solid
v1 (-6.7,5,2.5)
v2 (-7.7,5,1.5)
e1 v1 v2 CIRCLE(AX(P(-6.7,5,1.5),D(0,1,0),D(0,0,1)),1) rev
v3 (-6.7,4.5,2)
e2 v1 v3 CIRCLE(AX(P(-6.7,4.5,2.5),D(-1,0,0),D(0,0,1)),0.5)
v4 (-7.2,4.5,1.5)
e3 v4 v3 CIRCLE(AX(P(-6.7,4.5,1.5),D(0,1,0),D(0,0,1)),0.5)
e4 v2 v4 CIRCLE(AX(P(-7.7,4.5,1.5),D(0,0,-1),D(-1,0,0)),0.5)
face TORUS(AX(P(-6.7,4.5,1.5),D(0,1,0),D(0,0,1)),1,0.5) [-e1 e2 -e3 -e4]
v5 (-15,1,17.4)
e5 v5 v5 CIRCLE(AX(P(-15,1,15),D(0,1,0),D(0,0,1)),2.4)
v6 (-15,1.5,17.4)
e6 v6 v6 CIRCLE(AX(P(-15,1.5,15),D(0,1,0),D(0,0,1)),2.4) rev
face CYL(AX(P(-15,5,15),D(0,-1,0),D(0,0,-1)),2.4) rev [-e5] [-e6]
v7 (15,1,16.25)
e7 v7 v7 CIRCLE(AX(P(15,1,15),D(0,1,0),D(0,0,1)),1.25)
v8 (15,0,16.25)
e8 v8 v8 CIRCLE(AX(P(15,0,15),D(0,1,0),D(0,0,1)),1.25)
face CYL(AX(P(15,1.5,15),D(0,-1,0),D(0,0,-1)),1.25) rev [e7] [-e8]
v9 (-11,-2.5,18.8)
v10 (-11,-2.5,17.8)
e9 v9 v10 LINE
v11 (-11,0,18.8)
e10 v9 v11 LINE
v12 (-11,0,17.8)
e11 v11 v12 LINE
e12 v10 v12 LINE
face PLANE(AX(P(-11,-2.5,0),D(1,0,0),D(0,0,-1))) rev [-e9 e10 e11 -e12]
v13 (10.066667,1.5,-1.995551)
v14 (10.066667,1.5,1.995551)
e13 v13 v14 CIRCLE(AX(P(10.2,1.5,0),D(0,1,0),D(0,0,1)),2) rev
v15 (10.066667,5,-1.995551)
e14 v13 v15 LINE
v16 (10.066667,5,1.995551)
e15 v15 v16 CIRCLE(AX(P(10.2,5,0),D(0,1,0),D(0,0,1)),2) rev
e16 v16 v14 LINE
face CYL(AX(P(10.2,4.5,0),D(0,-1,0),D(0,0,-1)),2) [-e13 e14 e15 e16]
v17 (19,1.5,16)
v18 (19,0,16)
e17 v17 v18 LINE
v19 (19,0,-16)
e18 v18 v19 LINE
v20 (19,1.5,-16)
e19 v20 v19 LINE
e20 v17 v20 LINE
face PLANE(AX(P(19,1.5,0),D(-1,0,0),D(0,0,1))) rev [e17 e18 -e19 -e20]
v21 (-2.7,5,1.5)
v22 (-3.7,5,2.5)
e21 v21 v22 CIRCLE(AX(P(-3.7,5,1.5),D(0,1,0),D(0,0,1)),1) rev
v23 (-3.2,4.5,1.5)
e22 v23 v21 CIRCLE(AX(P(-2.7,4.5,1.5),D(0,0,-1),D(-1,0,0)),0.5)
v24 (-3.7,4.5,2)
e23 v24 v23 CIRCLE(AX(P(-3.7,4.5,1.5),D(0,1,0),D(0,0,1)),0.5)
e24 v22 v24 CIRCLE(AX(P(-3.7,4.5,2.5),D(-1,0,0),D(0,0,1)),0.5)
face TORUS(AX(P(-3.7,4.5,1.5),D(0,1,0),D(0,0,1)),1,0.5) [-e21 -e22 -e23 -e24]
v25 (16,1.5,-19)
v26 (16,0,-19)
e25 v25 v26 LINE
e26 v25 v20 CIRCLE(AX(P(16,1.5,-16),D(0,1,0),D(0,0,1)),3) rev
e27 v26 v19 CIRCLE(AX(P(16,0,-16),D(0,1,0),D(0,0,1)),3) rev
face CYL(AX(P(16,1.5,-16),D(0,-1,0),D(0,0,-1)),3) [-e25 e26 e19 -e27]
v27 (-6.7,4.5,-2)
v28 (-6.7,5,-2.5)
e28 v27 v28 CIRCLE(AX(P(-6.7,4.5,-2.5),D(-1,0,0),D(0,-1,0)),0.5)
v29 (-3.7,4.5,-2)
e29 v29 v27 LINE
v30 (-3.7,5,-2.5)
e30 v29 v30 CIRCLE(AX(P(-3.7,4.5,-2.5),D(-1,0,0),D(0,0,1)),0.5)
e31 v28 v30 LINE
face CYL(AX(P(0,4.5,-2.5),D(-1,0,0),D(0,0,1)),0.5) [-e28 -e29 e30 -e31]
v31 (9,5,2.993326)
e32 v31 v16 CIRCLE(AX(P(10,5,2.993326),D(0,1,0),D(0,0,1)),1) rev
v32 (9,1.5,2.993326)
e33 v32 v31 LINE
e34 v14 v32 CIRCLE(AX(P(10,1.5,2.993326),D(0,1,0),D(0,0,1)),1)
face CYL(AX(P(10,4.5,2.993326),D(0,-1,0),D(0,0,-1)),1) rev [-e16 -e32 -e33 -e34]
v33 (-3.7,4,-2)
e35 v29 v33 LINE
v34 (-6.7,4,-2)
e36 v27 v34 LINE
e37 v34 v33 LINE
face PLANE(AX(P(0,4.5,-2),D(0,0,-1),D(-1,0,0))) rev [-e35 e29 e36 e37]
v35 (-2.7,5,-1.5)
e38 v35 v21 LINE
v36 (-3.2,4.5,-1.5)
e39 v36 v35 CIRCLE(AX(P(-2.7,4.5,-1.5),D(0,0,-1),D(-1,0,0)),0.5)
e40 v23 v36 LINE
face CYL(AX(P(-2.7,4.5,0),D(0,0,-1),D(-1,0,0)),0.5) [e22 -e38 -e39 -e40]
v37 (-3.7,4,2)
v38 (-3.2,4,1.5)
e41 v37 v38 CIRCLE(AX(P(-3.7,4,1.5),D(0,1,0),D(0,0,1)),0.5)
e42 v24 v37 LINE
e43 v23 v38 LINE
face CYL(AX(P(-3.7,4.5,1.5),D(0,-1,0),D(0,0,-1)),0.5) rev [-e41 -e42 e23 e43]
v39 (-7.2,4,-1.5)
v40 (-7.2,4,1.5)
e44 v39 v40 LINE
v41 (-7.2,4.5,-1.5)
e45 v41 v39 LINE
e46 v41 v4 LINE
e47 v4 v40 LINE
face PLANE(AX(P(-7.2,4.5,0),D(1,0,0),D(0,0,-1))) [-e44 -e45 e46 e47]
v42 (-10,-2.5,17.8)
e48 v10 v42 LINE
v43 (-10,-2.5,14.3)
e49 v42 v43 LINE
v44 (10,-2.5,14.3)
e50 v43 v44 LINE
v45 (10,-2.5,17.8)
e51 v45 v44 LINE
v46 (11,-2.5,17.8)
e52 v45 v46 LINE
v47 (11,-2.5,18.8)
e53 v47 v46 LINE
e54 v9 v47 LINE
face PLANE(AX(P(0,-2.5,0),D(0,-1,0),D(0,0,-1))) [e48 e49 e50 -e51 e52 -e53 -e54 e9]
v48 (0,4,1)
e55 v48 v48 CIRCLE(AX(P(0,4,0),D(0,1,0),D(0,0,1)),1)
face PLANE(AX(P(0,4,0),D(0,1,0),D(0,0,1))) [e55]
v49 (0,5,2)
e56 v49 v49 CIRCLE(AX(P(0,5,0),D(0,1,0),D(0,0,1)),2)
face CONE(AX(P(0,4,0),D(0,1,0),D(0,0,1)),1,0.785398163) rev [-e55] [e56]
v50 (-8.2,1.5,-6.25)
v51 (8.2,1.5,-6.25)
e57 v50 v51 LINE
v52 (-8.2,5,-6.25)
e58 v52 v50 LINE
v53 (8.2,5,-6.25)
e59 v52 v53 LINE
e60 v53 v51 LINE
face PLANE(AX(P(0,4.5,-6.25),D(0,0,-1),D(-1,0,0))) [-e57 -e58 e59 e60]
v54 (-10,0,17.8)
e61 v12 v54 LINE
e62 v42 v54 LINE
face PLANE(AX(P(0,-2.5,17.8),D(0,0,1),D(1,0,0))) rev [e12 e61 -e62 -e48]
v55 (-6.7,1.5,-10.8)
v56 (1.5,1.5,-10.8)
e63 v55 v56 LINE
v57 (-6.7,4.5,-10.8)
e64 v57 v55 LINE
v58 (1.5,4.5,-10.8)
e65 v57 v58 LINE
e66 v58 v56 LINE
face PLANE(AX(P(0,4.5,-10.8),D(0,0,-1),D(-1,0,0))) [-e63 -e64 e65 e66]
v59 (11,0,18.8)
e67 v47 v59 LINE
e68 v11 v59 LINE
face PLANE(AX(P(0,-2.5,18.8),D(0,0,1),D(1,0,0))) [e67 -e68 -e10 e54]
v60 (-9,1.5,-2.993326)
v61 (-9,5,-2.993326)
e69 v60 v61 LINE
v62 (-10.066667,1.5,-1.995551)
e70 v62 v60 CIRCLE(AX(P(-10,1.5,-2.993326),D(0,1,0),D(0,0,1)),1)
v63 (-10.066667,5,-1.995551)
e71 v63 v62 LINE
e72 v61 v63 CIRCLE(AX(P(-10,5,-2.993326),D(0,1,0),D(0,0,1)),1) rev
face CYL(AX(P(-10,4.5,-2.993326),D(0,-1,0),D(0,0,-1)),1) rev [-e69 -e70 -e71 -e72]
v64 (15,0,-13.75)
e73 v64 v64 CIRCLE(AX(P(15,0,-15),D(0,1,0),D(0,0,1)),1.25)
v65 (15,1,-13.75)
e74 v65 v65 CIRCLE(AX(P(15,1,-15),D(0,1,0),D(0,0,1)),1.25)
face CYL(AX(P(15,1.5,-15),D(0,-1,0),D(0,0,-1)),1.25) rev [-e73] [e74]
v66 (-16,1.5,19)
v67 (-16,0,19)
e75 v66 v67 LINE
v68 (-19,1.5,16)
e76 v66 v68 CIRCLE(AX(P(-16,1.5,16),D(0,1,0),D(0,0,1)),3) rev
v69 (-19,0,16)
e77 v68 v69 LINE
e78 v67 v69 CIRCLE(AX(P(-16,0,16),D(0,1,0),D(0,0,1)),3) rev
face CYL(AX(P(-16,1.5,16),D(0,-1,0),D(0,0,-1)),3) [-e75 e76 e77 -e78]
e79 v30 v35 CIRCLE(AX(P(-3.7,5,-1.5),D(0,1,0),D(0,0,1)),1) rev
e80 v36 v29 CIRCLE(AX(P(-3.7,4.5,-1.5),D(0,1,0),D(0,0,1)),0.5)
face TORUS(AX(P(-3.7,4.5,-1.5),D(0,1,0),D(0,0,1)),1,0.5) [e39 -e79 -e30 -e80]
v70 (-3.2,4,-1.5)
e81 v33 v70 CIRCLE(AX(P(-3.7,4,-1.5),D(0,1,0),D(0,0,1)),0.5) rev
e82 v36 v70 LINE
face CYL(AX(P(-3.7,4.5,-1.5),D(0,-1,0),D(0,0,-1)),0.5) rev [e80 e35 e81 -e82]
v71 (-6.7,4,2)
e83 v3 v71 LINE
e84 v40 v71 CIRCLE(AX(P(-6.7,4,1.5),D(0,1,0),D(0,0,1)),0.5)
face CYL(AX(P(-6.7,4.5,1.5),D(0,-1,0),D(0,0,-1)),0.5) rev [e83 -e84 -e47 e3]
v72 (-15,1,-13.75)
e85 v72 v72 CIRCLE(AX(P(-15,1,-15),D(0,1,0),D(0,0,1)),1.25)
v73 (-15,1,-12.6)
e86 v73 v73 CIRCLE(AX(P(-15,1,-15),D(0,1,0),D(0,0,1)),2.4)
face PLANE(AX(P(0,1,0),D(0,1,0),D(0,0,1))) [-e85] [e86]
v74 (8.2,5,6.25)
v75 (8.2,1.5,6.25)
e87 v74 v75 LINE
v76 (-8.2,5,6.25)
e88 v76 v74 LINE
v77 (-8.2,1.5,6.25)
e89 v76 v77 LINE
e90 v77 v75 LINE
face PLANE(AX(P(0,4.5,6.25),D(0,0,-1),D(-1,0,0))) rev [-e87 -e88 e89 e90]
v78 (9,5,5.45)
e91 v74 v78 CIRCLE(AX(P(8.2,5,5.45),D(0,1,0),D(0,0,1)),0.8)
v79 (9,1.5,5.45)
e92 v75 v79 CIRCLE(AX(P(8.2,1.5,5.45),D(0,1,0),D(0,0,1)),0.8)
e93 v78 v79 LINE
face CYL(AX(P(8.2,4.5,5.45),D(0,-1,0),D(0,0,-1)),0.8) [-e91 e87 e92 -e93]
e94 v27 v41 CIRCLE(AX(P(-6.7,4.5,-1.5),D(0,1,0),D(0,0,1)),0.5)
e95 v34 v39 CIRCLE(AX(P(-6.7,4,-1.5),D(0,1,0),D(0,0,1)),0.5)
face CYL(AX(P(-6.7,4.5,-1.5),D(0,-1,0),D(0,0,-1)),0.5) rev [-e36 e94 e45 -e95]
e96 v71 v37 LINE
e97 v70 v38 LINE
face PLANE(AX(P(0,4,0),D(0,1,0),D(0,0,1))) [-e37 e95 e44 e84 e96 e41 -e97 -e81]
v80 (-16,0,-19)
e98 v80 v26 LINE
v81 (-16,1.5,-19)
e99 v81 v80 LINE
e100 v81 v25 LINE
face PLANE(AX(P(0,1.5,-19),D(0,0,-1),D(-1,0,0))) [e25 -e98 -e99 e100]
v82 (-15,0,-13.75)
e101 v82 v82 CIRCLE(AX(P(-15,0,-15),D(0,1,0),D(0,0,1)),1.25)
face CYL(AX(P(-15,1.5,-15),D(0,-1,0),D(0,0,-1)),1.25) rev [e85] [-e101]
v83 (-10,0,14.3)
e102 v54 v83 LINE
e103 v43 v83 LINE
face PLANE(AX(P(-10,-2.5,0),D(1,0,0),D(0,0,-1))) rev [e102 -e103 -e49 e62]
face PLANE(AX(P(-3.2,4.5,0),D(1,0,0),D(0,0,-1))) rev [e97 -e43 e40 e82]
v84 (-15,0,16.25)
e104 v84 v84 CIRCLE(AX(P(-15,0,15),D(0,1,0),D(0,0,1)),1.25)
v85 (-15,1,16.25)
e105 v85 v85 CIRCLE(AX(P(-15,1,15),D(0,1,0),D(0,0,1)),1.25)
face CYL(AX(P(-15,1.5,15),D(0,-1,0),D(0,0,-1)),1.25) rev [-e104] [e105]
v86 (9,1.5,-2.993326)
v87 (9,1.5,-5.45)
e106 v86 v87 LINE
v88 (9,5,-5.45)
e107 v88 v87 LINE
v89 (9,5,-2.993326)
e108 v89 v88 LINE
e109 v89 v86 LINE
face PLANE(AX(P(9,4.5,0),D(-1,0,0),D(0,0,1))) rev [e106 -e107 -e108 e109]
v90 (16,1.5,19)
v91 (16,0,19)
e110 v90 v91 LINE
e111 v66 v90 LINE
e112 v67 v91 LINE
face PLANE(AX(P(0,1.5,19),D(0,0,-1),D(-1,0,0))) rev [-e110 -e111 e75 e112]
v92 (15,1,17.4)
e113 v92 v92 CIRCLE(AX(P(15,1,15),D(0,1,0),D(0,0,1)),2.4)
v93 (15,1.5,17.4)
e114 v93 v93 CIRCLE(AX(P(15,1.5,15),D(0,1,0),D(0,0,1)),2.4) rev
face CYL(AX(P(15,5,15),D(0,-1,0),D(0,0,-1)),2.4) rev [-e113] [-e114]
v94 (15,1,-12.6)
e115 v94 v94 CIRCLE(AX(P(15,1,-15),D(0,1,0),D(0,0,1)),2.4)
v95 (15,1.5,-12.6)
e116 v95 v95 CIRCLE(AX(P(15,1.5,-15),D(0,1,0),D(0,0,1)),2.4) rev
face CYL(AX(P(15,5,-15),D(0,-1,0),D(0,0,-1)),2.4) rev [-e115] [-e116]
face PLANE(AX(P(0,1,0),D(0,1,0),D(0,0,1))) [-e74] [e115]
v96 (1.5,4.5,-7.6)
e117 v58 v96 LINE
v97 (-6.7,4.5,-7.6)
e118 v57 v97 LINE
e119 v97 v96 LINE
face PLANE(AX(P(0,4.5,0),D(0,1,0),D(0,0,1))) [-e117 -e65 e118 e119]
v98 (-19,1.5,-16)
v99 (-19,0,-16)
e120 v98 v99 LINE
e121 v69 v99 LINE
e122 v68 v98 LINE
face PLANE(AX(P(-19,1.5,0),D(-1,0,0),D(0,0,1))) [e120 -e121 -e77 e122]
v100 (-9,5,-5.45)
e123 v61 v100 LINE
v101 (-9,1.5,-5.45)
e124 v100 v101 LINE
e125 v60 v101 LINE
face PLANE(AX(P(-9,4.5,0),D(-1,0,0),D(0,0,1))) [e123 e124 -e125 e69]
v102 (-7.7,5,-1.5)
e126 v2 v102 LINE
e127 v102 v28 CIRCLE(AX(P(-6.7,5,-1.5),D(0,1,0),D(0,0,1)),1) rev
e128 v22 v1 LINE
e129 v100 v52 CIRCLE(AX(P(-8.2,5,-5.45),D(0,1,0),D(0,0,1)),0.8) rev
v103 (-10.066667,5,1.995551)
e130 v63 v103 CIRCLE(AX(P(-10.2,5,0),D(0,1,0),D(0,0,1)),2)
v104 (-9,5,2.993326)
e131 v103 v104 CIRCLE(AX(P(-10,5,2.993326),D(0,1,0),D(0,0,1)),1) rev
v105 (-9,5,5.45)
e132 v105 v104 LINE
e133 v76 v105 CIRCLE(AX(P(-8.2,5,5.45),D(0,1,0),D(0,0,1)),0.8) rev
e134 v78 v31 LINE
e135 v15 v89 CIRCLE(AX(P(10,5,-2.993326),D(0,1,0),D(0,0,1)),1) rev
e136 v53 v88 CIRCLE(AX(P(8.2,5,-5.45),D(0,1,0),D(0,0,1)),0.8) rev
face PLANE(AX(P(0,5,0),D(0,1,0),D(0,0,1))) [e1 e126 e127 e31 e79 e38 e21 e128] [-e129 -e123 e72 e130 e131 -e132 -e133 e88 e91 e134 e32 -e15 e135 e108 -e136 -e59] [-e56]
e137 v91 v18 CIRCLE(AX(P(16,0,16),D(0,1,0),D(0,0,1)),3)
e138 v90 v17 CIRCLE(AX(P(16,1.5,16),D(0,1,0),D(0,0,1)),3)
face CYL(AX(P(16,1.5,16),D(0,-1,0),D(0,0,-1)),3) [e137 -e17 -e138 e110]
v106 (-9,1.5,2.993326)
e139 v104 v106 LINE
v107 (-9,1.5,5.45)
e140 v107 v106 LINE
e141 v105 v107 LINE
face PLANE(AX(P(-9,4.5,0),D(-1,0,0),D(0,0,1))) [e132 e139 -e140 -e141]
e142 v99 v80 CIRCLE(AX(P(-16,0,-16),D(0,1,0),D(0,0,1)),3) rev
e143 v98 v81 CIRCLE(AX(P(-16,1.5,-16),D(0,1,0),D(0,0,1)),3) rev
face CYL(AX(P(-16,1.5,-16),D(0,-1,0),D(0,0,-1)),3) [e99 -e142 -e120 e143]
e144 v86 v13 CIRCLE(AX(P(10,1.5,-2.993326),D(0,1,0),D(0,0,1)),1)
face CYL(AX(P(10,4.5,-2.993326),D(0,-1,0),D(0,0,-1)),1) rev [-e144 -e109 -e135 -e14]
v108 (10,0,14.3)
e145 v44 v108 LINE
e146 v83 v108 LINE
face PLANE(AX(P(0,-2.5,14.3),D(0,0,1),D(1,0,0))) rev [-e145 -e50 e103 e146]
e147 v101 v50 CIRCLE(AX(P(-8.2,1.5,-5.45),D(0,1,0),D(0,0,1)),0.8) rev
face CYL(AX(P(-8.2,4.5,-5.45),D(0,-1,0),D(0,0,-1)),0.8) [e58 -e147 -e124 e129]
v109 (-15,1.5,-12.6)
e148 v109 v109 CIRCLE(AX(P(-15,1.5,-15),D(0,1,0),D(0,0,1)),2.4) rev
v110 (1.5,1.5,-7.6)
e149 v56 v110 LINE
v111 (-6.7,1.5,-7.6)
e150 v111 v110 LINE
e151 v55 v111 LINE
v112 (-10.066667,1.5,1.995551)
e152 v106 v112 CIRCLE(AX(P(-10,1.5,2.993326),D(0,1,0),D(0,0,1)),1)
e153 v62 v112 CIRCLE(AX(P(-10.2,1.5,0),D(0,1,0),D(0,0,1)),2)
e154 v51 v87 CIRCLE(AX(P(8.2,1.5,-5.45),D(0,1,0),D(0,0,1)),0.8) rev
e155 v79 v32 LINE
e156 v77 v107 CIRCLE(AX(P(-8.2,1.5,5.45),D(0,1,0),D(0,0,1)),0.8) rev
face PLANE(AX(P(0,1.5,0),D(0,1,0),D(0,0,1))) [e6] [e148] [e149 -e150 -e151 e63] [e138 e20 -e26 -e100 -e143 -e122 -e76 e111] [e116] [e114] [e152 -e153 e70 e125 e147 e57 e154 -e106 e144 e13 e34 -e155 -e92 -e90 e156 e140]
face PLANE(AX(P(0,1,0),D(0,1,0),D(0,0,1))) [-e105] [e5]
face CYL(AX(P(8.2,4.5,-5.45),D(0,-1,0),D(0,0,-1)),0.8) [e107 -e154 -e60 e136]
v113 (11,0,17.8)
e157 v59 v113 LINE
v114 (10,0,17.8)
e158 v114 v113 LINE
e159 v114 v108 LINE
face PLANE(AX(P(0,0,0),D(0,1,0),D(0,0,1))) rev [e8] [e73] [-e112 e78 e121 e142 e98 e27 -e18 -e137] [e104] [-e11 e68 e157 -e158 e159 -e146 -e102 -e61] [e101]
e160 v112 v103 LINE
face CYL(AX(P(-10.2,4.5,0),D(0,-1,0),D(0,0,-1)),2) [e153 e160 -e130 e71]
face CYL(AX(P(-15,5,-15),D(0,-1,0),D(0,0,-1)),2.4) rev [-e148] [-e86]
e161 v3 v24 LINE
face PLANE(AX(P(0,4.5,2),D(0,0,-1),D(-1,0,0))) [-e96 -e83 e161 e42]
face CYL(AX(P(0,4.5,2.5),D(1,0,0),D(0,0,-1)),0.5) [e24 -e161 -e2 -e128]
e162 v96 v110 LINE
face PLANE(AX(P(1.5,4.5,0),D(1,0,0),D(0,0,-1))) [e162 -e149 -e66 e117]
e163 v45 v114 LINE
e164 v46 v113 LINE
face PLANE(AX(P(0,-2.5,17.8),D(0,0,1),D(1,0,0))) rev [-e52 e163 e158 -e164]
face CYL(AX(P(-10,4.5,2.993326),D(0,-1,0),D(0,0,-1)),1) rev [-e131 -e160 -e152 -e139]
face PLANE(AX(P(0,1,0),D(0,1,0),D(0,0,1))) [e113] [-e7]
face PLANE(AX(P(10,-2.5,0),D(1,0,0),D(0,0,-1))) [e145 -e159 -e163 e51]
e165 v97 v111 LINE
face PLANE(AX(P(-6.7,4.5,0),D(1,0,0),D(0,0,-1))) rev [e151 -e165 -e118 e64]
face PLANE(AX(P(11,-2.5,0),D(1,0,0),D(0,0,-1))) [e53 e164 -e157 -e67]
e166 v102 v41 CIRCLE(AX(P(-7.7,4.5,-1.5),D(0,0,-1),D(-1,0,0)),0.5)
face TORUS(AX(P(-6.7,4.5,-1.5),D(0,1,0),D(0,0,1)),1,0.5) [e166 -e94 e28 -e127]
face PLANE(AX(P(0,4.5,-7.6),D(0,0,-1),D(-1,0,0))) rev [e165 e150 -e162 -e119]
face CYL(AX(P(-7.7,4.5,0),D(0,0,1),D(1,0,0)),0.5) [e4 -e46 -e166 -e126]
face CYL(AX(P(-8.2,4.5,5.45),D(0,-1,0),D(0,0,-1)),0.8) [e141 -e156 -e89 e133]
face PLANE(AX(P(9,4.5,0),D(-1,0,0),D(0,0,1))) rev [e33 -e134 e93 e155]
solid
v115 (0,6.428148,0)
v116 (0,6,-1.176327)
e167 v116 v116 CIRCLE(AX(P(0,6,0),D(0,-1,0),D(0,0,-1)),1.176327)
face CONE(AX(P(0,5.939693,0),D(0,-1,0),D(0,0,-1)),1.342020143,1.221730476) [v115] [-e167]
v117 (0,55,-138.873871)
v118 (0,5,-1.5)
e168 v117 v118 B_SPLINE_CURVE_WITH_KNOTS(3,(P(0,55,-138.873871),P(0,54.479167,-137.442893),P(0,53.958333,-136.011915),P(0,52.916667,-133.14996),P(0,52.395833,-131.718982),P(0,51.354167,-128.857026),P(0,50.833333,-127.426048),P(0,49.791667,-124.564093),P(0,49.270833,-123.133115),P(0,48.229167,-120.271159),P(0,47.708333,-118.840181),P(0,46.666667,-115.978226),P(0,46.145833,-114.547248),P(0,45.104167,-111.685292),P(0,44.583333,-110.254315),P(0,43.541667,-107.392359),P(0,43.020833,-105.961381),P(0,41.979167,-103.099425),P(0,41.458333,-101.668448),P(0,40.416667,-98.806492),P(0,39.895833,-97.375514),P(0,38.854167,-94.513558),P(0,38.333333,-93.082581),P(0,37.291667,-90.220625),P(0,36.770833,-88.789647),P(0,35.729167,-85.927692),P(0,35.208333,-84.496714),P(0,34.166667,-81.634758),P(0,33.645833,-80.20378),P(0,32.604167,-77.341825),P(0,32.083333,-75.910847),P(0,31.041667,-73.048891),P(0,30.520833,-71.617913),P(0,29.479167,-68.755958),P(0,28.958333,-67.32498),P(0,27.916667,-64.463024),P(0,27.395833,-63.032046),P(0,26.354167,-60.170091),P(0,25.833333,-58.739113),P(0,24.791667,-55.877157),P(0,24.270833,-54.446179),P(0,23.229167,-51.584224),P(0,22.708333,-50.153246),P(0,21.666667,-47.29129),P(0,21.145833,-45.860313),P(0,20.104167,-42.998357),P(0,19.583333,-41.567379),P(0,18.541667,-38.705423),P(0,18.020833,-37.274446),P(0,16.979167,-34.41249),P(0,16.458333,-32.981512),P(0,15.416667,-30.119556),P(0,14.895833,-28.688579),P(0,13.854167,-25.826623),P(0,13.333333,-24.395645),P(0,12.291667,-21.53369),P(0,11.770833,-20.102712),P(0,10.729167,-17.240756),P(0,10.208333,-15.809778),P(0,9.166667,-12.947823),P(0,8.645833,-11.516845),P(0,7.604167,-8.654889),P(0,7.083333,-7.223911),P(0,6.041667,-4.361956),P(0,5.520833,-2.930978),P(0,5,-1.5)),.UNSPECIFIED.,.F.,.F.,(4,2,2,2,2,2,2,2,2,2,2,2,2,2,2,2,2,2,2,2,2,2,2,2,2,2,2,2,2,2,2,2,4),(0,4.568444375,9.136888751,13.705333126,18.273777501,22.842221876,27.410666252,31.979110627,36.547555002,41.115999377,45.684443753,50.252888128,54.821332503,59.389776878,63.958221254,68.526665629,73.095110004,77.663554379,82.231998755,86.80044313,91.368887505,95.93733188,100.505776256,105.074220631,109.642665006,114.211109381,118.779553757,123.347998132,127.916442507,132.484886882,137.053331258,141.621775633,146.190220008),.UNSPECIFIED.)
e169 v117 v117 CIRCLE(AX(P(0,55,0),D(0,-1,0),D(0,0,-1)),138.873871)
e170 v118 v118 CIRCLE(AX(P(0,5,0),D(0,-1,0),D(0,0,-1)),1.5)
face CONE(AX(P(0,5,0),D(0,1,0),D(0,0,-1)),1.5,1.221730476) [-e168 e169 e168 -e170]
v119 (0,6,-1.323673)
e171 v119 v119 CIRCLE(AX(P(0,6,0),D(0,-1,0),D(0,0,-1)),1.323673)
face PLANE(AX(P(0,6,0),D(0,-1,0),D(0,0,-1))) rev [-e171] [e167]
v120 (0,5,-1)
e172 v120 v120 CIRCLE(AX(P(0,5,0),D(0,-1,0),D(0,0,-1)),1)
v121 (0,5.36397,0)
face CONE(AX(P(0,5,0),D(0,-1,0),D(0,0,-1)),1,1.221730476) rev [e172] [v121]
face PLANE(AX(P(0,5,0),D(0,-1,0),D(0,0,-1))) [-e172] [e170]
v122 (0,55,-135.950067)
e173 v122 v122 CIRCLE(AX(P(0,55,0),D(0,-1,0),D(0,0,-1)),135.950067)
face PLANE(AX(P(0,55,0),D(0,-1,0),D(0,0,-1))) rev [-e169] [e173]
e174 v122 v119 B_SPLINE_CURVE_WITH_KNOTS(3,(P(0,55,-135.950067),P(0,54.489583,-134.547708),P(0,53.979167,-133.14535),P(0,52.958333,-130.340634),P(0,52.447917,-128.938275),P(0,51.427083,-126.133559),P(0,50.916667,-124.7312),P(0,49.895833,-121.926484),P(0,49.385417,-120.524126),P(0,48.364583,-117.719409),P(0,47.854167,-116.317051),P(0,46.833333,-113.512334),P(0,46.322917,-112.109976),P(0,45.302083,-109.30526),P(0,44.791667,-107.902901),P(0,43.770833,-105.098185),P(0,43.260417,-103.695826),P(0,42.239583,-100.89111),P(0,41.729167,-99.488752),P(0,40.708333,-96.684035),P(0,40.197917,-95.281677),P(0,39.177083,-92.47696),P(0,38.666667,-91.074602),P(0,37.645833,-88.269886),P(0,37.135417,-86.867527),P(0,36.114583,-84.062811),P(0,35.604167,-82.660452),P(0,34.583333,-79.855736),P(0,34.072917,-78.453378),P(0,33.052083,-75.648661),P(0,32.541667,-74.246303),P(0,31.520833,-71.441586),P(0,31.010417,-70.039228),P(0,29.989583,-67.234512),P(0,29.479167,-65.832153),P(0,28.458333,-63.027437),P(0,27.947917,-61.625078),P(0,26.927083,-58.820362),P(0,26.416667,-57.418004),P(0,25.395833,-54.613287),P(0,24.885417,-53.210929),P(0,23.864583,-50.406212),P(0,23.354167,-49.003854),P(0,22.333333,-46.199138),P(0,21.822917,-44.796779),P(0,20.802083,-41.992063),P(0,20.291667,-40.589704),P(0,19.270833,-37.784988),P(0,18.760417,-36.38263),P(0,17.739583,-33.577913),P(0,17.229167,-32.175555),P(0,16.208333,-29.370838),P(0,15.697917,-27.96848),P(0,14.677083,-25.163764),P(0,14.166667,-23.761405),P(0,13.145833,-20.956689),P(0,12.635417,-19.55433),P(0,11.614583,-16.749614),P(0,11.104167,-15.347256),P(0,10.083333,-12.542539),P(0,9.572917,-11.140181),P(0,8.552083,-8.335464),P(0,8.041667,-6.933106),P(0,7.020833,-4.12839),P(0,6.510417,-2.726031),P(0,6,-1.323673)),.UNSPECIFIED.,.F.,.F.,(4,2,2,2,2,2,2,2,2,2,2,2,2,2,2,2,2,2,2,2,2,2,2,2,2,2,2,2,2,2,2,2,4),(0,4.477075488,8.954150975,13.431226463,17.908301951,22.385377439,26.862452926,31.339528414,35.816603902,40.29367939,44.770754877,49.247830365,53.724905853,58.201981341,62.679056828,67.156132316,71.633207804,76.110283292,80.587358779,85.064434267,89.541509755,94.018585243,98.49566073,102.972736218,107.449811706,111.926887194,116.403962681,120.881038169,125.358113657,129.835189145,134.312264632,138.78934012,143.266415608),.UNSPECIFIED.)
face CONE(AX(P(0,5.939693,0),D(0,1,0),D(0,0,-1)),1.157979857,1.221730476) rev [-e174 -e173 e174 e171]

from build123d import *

# Parameters (mm, degrees)
SKETCH1_R           = 2.4
SKETCH1_W           = 8.2
SKETCH1_H           = 3.2
SKETCH1_R_2         = 1.25
BOSS_EXTRUDE1_DEPTH = 1.5
SKETCH1_3_R         = 2
SKETCH1_3_W         = 8.2
SKETCH1_3_H         = 3.2
BOSS_EXTRUDE2_DEPTH = 4.5
SKETCH1_4_R         = 2
BOSS_EXTRUDE3_DEPTH = 5
SKETCH1_5_R         = 2
BOSS_EXTRUDE4_DEPTH = 4
CUT_EXTRUDE1_START  = 1
SKETCH1_6_R         = 2.4
SKETCH1_6_R_2       = 1.25
CUT_EXTRUDE1_DEPTH  = 4
CHAMFER1_SIZE       = 1
FILLET1_R           = 0.5
FILLET2_R           = 1
SKETCH2_W           = 22
SKETCH2_H           = 1
SKETCH2_W_2         = 20
SKETCH2_H_2         = 3.5
BOSS_EXTRUDE5_DEPTH = 2.5
SHELL1_T            = -1


# Read off the part's stored shape, not the designer's step: Boss-Extrude6
with BuildPart() as part:
    # Sketch1 → Boss-Extrude1 (new body)
    # profile 1 of 5: a face of its own
    with BuildSketch(Plane(origin=(0, 0, 0), x_dir=(1, 0, 0), z_dir=(0, 1, 0))):
        with BuildLine():
            ThreePointArc((-19, 16), (-18.121320344, 18.121320344), (-16, 19))
            Line((-16, 19), (16, 19))
            ThreePointArc((16, 19), (18.121320344, 18.121320344), (19, 16))
            Line((19, 16), (19, -16))
            ThreePointArc((19, -16), (18.121320344, -18.121320344), (16, -19))
            Line((16, -19), (-16, -19))
            ThreePointArc((-16, -19), (-18.121320344, -18.121320344), (-19, -16))
            Line((-19, -16), (-19, 16))
        make_face()
        with Locations((15, -15)):
            Circle(SKETCH1_R, mode=Mode.SUBTRACT)
        with Locations((15, 15)):
            Circle(SKETCH1_R, mode=Mode.SUBTRACT)
        with Locations((-15, 15)):
            Circle(SKETCH1_R, mode=Mode.SUBTRACT)
        with Locations((-15, -15)):
            Circle(SKETCH1_R, mode=Mode.SUBTRACT)
        with Locations((-2.6, 9.2)):
            Rectangle(SKETCH1_W, SKETCH1_H, mode=Mode.SUBTRACT)
        with BuildLine():
            Line((-9, 1.6), (-9, 5.45))
            ThreePointArc((-9, 5.45), (-8.765685425, 6.015685425), (-8.2, 6.25))
            Line((-8.2, 6.25), (8.2, 6.25))
            ThreePointArc((8.2, 6.25), (8.765685425, 6.015685425), (9, 5.45))
            Line((9, 5.45), (9, 1.6))
            ThreePointArc((9, 1.6), (12.2, 0), (9, -1.6))
            Line((9, -1.6), (9, -5.45))
            ThreePointArc((9, -5.45), (8.765685425, -6.015685425), (8.2, -6.25))
            Line((8.2, -6.25), (-8.2, -6.25))
            ThreePointArc((-8.2, -6.25), (-8.765685425, -6.015685425), (-9, -5.45))
            Line((-9, -5.45), (-9, -1.6))
            ThreePointArc((-9, -1.6), (-12.2, 0), (-9, 1.6))
        make_face(mode=Mode.SUBTRACT)
    # profile 2 of 5: a face of its own
    with BuildSketch(Plane(origin=(0, 0, 0), x_dir=(1, 0, 0), z_dir=(0, 1, 0))):
        with Locations((15, 15)):
            Circle(SKETCH1_R)
        with Locations(Location((15, 15, 0), (0, 0, 270))):
            Circle(SKETCH1_R_2, mode=Mode.SUBTRACT)
    # profile 3 of 5: a face of its own
    with BuildSketch(Plane(origin=(0, 0, 0), x_dir=(1, 0, 0), z_dir=(0, 1, 0))):
        with Locations((-15, 15)):
            Circle(SKETCH1_R)
        with Locations(Location((-15, 15, 0), (0, 0, 270))):
            Circle(SKETCH1_R_2, mode=Mode.SUBTRACT)
    # profile 4 of 5: a face of its own
    with BuildSketch(Plane(origin=(0, 0, 0), x_dir=(1, 0, 0), z_dir=(0, 1, 0))):
        with Locations((-15, -15)):
            Circle(SKETCH1_R)
        with Locations(Location((-15, -15, 0), (0, 0, 270))):
            Circle(SKETCH1_R_2, mode=Mode.SUBTRACT)
    # profile 5 of 5: a face of its own
    with BuildSketch(Plane(origin=(0, 0, 0), x_dir=(1, 0, 0), z_dir=(0, 1, 0))):
        with Locations((15, -15)):
            Circle(SKETCH1_R)
        with Locations(Location((15, -15, 0), (0, 0, 270))):
            Circle(SKETCH1_R_2, mode=Mode.SUBTRACT)
    extrude(amount=BOSS_EXTRUDE1_DEPTH)

    # Sketch1<3> → Boss-Extrude2 (add)
    # profile 1 of 2: a face of its own
    with BuildSketch(Plane(origin=(0, 0, 0), x_dir=(1, 0, 0), z_dir=(0, 1, 0))):
        with BuildLine():
            ThreePointArc((-9, 5.45), (-8.765685425, 6.015685425), (-8.2, 6.25))
            Line((-8.2, 6.25), (8.2, 6.25))
            ThreePointArc((8.2, 6.25), (8.765685425, 6.015685425), (9, 5.45))
            Line((9, 5.45), (9, 1.6))
            ThreePointArc((9, 1.6), (12.2, 0), (9, -1.6))
            Line((9, -1.6), (9, -5.45))
            ThreePointArc((9, -5.45), (8.765685425, -6.015685425), (8.2, -6.25))
            Line((8.2, -6.25), (-8.2, -6.25))
            ThreePointArc((-8.2, -6.25), (-8.765685425, -6.015685425), (-9, -5.45))
            Line((-9, -5.45), (-9, -1.6))
            ThreePointArc((-9, -1.6), (-12.2, 0), (-9, 1.6))
            Line((-9, 1.6), (-9, 5.45))
        make_face()
        with Locations(Location((0, 0, 0), (0, 0, 270))):
            Circle(SKETCH1_3_R, mode=Mode.SUBTRACT)
        with BuildLine():
            ThreePointArc((-6.7, 2), (-7.053553391, 1.853553391), (-7.2, 1.5))
            Line((-7.2, 1.5), (-7.2, -1.5))
            ThreePointArc((-7.2, -1.5), (-7.053553391, -1.853553391), (-6.7, -2))
            Line((-6.7, -2), (-3.7, -2))
            ThreePointArc((-3.7, -2), (-3.346446609, -1.853553391), (-3.2, -1.5))
            Line((-3.2, -1.5), (-3.2, 1.5))
            ThreePointArc((-3.2, 1.5), (-3.346446609, 1.853553391), (-3.7, 2))
            Line((-3.7, 2), (-6.7, 2))
        make_face(mode=Mode.SUBTRACT)
    # profile 2 of 2: a face of its own
    with BuildSketch(Plane(origin=(0, 0, 0), x_dir=(1, 0, 0), z_dir=(0, 1, 0))):
        with Locations((-2.6, 9.2)):
            Rectangle(SKETCH1_3_W, SKETCH1_3_H)
    extrude(amount=BOSS_EXTRUDE2_DEPTH)

    # Sketch1<4> → Boss-Extrude3 (add)
    with BuildSketch(Plane(origin=(0, 0, 0), x_dir=(1, 0, 0), z_dir=(0, 1, 0))):
        with BuildLine():
            ThreePointArc((-9, 5.45), (-8.765685425, 6.015685425), (-8.2, 6.25))
            Line((-8.2, 6.25), (8.2, 6.25))
            ThreePointArc((8.2, 6.25), (8.765685425, 6.015685425), (9, 5.45))
            Line((9, 5.45), (9, 1.6))
            ThreePointArc((9, 1.6), (12.2, 0), (9, -1.6))
            Line((9, -1.6), (9, -5.45))
            ThreePointArc((9, -5.45), (8.765685425, -6.015685425), (8.2, -6.25))
            Line((8.2, -6.25), (-8.2, -6.25))
            ThreePointArc((-8.2, -6.25), (-8.765685425, -6.015685425), (-9, -5.45))
            Line((-9, -5.45), (-9, -1.6))
            ThreePointArc((-9, -1.6), (-12.2, 0), (-9, 1.6))
            Line((-9, 1.6), (-9, 5.45))
        make_face()
        with Locations(Location((0, 0, 0), (0, 0, 270))):
            Circle(SKETCH1_4_R, mode=Mode.SUBTRACT)
        with BuildLine():
            ThreePointArc((-6.7, 2), (-7.053553391, 1.853553391), (-7.2, 1.5))
            Line((-7.2, 1.5), (-7.2, -1.5))
            ThreePointArc((-7.2, -1.5), (-7.053553391, -1.853553391), (-6.7, -2))
            Line((-6.7, -2), (-3.7, -2))
            ThreePointArc((-3.7, -2), (-3.346446609, -1.853553391), (-3.2, -1.5))
            Line((-3.2, -1.5), (-3.2, 1.5))
            ThreePointArc((-3.2, 1.5), (-3.346446609, 1.853553391), (-3.7, 2))
            Line((-3.7, 2), (-6.7, 2))
        make_face(mode=Mode.SUBTRACT)
    extrude(amount=BOSS_EXTRUDE3_DEPTH)

    # Sketch1<5> → Boss-Extrude4 (add)
    with BuildSketch(Plane(origin=(0, 0, 0), x_dir=(1, 0, 0), z_dir=(0, 1, 0))):
        with BuildLine():
            Line((-6.7, 2), (-3.7, 2))
            ThreePointArc((-3.7, 2), (-3.346446609, 1.853553391), (-3.2, 1.5))
            Line((-3.2, 1.5), (-3.2, -1.5))
            ThreePointArc((-3.2, -1.5), (-3.346446609, -1.853553391), (-3.7, -2))
            Line((-3.7, -2), (-6.7, -2))
            ThreePointArc((-6.7, -2), (-7.053553391, -1.853553391), (-7.2, -1.5))
            Line((-7.2, -1.5), (-7.2, 1.5))
            ThreePointArc((-7.2, 1.5), (-7.053553391, 1.853553391), (-6.7, 2))
        make_face()
        with Locations(Location((0, 0, 0), (0, 0, 270))):
            Circle(SKETCH1_5_R)
    extrude(amount=BOSS_EXTRUDE4_DEPTH)

    # Sketch1<6> → Cut-Extrude1 (cut)
    # profile 1 of 4: a face of its own
    with BuildSketch(Plane(origin=(0, 0, 0), x_dir=(1, 0, 0), z_dir=(0, 1, 0)).offset(CUT_EXTRUDE1_START)):
        with Locations(Location((-15, 15, 0), (0, 0, 270))):
            Circle(SKETCH1_6_R)
        with Locations(Location((-15, 15, 0), (0, 0, 270))):
            Circle(SKETCH1_6_R_2, mode=Mode.SUBTRACT)
    # profile 2 of 4: a face of its own
    with BuildSketch(Plane(origin=(0, 0, 0), x_dir=(1, 0, 0), z_dir=(0, 1, 0)).offset(CUT_EXTRUDE1_START)):
        with Locations(Location((-15, -15, 0), (0, 0, 270))):
            Circle(SKETCH1_6_R)
        with Locations(Location((-15, -15, 0), (0, 0, 270))):
            Circle(SKETCH1_6_R_2, mode=Mode.SUBTRACT)
    # profile 3 of 4: a face of its own
    with BuildSketch(Plane(origin=(0, 0, 0), x_dir=(1, 0, 0), z_dir=(0, 1, 0)).offset(CUT_EXTRUDE1_START)):
        with Locations(Location((15, -15, 0), (0, 0, 270))):
            Circle(SKETCH1_6_R)
        with Locations(Location((15, -15, 0), (0, 0, 270))):
            Circle(SKETCH1_6_R_2, mode=Mode.SUBTRACT)
    # profile 4 of 4: a face of its own
    with BuildSketch(Plane(origin=(0, 0, 0), x_dir=(1, 0, 0), z_dir=(0, 1, 0)).offset(CUT_EXTRUDE1_START)):
        with Locations(Location((15, 15, 0), (0, 0, 270))):
            Circle(SKETCH1_6_R)
        with Locations(Location((15, 15, 0), (0, 0, 270))):
            Circle(SKETCH1_6_R_2, mode=Mode.SUBTRACT)
    extrude(amount=CUT_EXTRUDE1_DEPTH, mode=Mode.SUBTRACT)

    # Chamfer1
    chamfer1_edges = [part.edges().sort_by_distance(p)[0] for p in [
        (0, 4, -2),
    ]]
    chamfer(chamfer1_edges, length=CHAMFER1_SIZE - 0.0001)  # a hair under: the kernel refuses the full size

    # Fillet1
    fillet1_edges = [part.edges().sort_by_distance(p)[0] for p in [
        (-7.053553391, 5, -1.853553391),
        (-3.346446609, 5, 1.853553391),
        (-5.2, 5, 2),
        (-7.053553391, 5, 1.853553391),
        (-7.2, 5, 0),
        (-5.2, 5, -2),
        (-3.346446609, 5, -1.853553391),
        (-3.2, 5, 0),
    ]]
    fillet(fillet1_edges, radius=FILLET1_R)

    # Fillet2
    fillet2_edges = [part.edges().sort_by_distance(p)[0] for p in [
        (-9, 3.25, -1.6),
        (-9, 3.25, 1.6),
        (9, 3.25, 1.6),
        (9, 3.25, -1.6),
    ]]
    fillet(fillet2_edges, radius=FILLET2_R)

    # Sketch2 → Boss-Extrude5 (add)
    with BuildSketch(Plane.XZ):
        with Locations((0, 18.3)):
            Rectangle(SKETCH2_W, SKETCH2_H)
        with Locations((0, 16.05)):
            Rectangle(SKETCH2_W_2, SKETCH2_H_2)
    extrude(amount=BOSS_EXTRUDE5_DEPTH)


with BuildPart() as body_2:
    # Boss-Extrude6 outline → Boss-Extrude6 (revolve)
    with BuildSketch(Plane.XY):
        Polygon((1, 5), (1.5, 5), (138.873870973, 55), (0, 55), (0, 5.363970234), align=None)
    revolve(axis=Axis((0, 0, 0), (0, 1, 0)))

    # Shell1
    shell1_openings = [body_2.faces().sort_by_distance(p)[0] for p in [
        (0, 55, 0),
    ]]
    offset(amount=SHELL1_T, openings=shell1_openings, kind=Kind.INTERSECTION)


solid = Compound([part.part, body_2.part])
